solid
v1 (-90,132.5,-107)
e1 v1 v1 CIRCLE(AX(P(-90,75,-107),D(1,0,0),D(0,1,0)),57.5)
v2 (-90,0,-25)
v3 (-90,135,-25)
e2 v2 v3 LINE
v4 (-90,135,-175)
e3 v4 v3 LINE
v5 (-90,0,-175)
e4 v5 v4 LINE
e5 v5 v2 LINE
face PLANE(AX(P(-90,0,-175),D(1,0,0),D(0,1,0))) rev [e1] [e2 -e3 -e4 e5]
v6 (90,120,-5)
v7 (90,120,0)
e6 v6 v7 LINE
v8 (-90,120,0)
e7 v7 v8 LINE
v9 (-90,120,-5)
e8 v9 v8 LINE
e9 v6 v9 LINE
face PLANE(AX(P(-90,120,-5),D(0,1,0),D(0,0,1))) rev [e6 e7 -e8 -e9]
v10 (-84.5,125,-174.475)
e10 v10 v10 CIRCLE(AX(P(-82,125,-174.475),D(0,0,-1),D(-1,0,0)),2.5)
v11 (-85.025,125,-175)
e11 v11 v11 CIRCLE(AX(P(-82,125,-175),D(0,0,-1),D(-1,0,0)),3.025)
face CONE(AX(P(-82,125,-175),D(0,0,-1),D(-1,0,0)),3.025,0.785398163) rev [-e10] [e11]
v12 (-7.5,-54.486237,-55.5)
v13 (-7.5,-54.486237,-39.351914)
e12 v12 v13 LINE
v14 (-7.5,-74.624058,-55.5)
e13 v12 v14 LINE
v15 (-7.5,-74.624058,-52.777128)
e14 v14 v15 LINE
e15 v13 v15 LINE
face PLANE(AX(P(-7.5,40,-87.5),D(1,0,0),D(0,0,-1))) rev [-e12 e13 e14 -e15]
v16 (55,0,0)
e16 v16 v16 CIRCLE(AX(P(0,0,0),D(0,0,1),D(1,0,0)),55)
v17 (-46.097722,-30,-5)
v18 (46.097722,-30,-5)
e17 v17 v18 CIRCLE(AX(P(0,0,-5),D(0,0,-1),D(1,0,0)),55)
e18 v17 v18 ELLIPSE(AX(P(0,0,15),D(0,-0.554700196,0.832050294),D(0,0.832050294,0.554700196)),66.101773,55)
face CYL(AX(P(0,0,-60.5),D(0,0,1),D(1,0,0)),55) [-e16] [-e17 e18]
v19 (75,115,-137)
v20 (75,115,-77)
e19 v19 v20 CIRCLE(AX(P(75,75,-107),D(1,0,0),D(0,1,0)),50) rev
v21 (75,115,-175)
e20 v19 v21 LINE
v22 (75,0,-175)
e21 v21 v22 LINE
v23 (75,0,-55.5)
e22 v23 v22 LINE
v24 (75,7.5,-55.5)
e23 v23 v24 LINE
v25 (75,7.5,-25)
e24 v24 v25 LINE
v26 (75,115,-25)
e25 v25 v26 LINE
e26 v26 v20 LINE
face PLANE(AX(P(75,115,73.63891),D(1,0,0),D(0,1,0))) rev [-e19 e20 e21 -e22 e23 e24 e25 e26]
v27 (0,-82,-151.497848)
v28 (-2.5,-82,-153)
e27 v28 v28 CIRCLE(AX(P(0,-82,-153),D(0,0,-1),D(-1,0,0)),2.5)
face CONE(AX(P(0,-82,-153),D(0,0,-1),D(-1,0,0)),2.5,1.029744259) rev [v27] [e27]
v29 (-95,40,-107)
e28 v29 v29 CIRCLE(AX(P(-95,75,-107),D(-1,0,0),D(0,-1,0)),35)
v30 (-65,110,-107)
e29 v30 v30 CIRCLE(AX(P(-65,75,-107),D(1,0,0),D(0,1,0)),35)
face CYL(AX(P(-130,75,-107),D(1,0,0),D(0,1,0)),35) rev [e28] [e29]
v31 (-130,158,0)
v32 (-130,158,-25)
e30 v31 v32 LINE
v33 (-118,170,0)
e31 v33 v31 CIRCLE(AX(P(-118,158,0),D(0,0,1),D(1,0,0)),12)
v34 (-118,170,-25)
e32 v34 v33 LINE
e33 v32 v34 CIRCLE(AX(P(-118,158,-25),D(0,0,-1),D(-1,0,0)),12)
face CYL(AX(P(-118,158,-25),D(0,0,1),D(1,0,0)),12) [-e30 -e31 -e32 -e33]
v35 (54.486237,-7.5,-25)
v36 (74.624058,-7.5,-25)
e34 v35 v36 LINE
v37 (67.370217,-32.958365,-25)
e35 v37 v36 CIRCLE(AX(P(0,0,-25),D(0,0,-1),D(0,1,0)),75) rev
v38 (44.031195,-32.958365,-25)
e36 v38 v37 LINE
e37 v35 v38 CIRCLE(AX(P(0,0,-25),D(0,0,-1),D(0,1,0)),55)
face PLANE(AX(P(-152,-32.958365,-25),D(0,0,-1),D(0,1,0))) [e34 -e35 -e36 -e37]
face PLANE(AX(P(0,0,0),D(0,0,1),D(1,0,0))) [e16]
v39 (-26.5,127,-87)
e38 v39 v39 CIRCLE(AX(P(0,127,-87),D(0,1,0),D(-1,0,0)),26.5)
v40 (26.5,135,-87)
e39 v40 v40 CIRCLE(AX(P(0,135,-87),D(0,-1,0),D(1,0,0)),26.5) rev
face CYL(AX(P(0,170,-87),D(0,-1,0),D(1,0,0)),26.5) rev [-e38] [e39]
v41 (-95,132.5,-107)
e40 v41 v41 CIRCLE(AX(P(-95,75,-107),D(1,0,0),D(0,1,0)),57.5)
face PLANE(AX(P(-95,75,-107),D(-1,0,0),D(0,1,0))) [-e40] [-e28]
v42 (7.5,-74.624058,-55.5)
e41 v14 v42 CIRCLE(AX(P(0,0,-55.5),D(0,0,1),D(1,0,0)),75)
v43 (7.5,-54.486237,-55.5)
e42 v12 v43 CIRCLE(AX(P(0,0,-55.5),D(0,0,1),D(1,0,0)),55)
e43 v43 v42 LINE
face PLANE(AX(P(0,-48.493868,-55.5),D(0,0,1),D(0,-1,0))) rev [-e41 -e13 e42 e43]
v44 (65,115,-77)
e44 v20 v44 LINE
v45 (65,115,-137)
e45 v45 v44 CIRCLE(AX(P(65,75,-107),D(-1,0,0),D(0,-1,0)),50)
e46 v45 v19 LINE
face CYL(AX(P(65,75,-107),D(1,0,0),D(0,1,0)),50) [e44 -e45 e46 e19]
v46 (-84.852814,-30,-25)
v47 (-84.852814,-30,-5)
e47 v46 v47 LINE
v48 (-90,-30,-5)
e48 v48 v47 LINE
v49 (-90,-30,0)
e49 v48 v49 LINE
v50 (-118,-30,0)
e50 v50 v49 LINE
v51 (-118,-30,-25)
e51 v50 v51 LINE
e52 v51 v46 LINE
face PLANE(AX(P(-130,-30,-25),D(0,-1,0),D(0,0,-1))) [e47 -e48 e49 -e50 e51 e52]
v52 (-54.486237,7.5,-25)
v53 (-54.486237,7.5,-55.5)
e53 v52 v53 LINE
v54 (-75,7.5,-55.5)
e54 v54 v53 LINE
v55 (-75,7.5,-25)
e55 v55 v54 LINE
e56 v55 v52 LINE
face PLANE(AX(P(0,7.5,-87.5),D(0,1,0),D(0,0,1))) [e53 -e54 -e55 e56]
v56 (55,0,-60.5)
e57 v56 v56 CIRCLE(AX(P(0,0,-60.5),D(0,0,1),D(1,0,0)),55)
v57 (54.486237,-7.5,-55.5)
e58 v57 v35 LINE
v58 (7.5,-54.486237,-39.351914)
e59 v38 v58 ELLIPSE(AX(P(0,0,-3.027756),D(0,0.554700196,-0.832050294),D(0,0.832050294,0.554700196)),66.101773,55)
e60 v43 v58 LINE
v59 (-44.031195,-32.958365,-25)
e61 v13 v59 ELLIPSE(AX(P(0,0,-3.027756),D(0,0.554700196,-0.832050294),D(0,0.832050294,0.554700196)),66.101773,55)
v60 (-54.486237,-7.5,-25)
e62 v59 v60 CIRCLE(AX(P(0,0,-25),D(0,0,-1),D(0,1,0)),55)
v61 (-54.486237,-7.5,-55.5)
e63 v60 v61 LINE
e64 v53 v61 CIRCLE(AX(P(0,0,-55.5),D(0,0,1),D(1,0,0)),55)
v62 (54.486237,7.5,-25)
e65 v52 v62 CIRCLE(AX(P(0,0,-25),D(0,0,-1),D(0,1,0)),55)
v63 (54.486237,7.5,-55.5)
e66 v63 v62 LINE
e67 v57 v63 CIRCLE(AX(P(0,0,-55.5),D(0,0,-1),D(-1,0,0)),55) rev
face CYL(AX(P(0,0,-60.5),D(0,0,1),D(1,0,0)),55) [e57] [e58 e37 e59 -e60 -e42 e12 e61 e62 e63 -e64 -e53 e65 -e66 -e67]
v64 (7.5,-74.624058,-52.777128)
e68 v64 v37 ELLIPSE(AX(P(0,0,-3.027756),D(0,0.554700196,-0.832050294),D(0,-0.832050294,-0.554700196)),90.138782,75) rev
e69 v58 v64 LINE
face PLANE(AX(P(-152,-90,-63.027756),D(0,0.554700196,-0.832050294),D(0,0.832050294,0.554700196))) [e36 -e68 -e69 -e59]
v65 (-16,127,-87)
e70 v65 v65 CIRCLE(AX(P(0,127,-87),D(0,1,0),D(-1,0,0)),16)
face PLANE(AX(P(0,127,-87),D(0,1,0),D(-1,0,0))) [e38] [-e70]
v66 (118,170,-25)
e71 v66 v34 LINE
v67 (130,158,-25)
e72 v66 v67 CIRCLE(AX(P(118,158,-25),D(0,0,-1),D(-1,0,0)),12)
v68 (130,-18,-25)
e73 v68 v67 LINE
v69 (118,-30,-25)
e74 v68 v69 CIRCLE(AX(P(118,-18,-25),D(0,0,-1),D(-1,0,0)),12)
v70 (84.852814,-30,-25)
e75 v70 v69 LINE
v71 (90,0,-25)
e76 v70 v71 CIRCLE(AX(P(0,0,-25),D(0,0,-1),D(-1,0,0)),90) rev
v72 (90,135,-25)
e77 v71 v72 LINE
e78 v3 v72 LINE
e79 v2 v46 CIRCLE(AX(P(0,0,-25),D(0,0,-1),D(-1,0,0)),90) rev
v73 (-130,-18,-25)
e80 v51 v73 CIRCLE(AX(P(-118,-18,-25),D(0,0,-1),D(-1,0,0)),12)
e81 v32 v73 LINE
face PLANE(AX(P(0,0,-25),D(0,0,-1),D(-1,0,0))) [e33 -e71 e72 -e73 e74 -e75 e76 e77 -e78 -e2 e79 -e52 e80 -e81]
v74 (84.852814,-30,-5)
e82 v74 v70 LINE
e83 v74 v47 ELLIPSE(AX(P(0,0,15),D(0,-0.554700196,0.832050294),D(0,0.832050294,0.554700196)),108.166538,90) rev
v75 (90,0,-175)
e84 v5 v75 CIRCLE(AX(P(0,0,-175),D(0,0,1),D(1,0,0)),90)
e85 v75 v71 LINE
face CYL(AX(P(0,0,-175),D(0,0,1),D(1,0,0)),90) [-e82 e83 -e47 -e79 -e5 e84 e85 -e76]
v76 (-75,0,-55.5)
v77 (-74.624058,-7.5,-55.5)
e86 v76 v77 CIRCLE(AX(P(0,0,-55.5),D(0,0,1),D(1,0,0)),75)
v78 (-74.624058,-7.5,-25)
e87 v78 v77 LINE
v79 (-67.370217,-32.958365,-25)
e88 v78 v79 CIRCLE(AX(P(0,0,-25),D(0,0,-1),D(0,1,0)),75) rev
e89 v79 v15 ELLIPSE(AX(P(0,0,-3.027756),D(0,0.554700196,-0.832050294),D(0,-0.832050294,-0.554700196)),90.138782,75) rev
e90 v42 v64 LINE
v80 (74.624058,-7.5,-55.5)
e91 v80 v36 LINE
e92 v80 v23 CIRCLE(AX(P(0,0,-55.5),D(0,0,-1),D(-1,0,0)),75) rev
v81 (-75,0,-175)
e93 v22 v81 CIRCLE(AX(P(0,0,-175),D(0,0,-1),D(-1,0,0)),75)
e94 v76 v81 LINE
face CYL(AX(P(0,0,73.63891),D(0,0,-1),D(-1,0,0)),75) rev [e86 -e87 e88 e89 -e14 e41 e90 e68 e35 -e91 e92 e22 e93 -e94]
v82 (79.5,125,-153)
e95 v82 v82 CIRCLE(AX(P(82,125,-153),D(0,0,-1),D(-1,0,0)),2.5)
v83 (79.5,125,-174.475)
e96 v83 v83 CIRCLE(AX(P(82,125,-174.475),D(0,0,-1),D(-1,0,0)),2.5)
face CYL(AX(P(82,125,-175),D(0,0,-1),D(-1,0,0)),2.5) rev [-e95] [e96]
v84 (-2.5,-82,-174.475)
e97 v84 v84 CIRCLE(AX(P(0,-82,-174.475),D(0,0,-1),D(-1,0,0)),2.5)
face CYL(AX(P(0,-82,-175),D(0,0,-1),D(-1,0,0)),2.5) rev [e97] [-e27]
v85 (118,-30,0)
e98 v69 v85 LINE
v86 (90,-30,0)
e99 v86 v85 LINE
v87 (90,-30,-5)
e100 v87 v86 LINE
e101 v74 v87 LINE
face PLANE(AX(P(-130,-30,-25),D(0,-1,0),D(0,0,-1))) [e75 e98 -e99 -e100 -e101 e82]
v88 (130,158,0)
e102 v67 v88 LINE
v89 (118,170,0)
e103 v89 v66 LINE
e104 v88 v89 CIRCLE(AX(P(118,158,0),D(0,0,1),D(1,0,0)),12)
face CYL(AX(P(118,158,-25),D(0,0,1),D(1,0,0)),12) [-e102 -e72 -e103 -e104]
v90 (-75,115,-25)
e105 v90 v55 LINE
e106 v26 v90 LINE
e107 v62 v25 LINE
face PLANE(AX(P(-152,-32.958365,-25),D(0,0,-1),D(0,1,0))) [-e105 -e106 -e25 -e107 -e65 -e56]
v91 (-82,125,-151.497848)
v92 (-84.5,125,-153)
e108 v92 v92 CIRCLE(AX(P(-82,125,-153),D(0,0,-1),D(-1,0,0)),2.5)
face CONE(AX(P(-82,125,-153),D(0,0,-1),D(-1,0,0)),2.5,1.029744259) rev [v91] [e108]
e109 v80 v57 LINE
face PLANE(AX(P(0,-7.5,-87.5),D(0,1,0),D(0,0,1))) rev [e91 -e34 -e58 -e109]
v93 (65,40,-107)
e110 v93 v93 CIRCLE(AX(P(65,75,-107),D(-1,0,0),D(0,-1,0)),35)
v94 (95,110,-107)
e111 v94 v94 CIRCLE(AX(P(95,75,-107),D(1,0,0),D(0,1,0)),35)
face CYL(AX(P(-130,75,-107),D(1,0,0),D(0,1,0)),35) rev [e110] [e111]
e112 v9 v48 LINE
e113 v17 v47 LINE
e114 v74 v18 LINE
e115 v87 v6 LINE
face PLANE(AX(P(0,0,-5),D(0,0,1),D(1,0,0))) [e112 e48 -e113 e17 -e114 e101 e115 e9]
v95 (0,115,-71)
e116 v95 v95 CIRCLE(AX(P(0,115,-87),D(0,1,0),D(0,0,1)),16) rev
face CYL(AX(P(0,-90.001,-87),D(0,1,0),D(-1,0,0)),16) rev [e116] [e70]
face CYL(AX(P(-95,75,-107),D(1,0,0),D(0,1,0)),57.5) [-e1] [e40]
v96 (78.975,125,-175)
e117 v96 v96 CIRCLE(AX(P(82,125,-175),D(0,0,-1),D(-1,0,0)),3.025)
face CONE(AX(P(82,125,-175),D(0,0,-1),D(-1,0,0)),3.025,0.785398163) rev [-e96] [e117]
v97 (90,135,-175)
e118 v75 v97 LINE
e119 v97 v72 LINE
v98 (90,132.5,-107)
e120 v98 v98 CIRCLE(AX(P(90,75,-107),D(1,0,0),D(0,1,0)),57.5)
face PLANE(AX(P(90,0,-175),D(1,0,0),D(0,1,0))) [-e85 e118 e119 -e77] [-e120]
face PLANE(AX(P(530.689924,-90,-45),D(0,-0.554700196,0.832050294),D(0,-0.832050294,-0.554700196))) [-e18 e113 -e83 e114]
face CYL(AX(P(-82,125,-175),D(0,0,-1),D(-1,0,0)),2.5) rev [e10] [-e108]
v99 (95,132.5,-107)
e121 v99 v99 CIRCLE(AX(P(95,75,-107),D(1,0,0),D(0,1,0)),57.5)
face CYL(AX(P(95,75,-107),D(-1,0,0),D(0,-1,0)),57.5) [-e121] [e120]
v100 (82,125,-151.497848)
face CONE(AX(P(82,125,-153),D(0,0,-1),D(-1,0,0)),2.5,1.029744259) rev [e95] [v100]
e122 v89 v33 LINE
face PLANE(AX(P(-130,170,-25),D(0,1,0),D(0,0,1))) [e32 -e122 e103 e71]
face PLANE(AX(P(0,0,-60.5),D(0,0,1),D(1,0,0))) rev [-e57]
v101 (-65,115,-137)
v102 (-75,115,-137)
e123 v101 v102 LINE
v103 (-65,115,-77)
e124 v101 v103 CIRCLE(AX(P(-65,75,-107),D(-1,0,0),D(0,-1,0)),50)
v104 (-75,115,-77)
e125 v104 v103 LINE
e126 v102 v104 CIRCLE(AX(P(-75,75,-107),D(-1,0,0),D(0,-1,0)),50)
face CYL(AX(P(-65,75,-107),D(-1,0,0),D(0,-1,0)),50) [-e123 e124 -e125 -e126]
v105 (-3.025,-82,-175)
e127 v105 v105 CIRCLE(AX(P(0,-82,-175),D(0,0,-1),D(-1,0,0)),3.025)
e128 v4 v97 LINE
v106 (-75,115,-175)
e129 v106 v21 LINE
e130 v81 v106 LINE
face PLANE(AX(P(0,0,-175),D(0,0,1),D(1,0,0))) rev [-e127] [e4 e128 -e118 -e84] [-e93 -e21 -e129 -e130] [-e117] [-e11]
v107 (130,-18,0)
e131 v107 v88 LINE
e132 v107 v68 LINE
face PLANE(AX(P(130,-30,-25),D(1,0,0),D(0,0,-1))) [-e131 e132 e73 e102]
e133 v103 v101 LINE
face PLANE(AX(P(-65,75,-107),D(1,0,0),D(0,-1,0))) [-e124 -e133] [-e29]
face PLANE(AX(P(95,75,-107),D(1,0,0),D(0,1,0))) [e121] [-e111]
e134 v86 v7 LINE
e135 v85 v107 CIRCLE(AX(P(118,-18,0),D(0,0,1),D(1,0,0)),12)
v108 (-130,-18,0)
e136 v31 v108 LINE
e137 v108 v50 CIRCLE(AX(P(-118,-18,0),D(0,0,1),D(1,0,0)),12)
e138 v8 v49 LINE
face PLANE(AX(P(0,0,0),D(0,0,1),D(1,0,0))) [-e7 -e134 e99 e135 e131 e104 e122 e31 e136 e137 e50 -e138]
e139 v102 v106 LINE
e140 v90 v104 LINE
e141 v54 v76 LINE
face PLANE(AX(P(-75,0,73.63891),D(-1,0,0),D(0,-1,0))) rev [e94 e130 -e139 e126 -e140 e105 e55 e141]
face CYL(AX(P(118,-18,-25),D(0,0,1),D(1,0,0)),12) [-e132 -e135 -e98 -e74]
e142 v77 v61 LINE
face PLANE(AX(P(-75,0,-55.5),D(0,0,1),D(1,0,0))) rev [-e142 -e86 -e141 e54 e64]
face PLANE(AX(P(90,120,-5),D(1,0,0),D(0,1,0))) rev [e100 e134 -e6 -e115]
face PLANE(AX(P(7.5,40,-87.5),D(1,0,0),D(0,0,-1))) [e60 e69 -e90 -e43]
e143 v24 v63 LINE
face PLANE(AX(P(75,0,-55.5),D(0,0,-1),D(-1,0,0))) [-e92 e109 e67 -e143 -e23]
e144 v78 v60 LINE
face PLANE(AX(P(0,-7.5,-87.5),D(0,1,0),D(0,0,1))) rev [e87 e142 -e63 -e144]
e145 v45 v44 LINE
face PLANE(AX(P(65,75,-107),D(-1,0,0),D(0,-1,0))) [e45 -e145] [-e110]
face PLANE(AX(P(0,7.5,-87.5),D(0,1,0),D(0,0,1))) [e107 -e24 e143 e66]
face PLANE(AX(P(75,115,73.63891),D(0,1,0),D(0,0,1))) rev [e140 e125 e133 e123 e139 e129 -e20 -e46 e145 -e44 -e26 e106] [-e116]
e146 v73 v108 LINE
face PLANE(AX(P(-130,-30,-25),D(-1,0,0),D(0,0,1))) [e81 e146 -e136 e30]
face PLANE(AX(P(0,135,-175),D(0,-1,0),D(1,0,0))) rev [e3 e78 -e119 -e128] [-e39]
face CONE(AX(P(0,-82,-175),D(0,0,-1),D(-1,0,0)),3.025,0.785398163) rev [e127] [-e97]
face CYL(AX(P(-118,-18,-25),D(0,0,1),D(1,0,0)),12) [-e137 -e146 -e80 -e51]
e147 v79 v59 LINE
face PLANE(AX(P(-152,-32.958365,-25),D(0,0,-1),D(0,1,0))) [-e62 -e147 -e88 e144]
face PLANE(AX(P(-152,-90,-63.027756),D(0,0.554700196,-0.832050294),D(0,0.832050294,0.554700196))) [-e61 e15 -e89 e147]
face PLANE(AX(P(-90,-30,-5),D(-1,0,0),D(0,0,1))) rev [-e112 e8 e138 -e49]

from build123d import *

# Parameters (mm, degrees)
EXTRUDE_START                = -5
EXTRUDE_1_DEPTH              = 170
CUT_EXTRUDE_1_DEPTH          = 239.641991276
CUT_EXTRUDE_1_DEPTH_BACK     = 239.641991276
CUT_EXTRUDE_START            = -121.972243623
CUT_EXTRUDE_2_DEPTH          = 121.972243623
CUT_EXTRUDE_START_2          = -53.027756377
CUT_EXTRUDE_2_2_DEPTH        = 28.027756377
CUT_EXTRUDE_START_3          = -12.480754415
CUT_EXTRUDE_2_3_DEPTH        = 15
SKETCH_5_R                   = 55
EXTRUDE_2_DEPTH              = 60.5
SKETCH_6_W                   = 260
SKETCH_6_H                   = 200
EXTRUDE_3_DEPTH              = 25
CUT_EXTRUDE_3_DEPTH          = 5
FILLET_1_R                   = 12
SKETCH_9_R                   = 57.5
EXTRUDE_4_DEPTH              = 5
SKETCH_10_R                  = 50
EXTRUDE_5_DEPTH              = 30
CUT_EXTRUDE_4_DEPTH          = 332.888535558
CUT_EXTRUDE_4_DEPTH_BACK     = 332.888535558
SKETCH_11_R                  = 35
CUT_EXTRUDE_5_DEPTH          = 314.289004012
CUT_EXTRUDE_5_DEPTH_BACK     = 8
SKETCH_12_R                  = 26.5
CUT_EXTRUDE_6_REACH          = 309.594
SKETCH_13_R                  = 16
RIB_START                    = -7.5
RIB_1_DEPTH                  = 15
RIB_2_REACH                  = 278.451
SKETCH_15_WALL_W             = 586.29307431
SKETCH_15_WALL_H             = 15
HOLE_WIZARD_M6_1_D           = 5
HOLE_WIZARD_M6_1_DEPTH       = 22
HOLE_WIZARD_M6_1_CSINK_D     = 6.05
HOLE_WIZARD_M6_1_CSINK_ANGLE = 90
HOLE_WIZARD_M6_1_TIP         = 1.502151548
HOLE_WIZARD_M6_2_D           = 5
HOLE_WIZARD_M6_2_DEPTH       = 22
HOLE_WIZARD_M6_2_CSINK_D     = 6.05
HOLE_WIZARD_M6_2_CSINK_ANGLE = 90
HOLE_WIZARD_M6_2_TIP         = 1.502151548


with BuildPart() as part:
    # 草图1 → 凸台-拉伸1 (new body)
    with BuildSketch(Plane.XY.offset(EXTRUDE_START)):
        with BuildLine():
            Line((-90, 0), (-90, 135))
            Line((-90, 135), (90, 135))
            Line((90, 135), (90, 0))
            ThreePointArc((90, 0), (0, -90), (-90, 0))
        make_face()
    extrude(amount=-EXTRUDE_1_DEPTH)

    # 草图2 → 切除-拉伸1 (cut, two sides: drawn at the far end of the back side and taken through both)
    with BuildSketch(Plane(origin=(0, 0, 0), x_dir=(0, 0, -1), z_dir=(1, 0, 0)).offset(-CUT_EXTRUDE_1_DEPTH_BACK)):
        Polygon((338.831049921, -530.746574882), (45, -90), (5, -30), (-288.831049921, 410.746574882), (-1170.324199685, -176.915524961), (-542.662099843, -1118.408674725), align=None)
    extrude(amount=CUT_EXTRUDE_1_DEPTH + CUT_EXTRUDE_1_DEPTH_BACK, mode=Mode.SUBTRACT)

    # 切除-拉伸2: read off the stored shape, not the designer's step
    # 切除-拉伸2 outline → 切除-拉伸2 (cut)
    with BuildSketch(Plane(origin=(0, 0, -175), x_dir=(-1, 0, 0), z_dir=(0, 0, -1)).offset(CUT_EXTRUDE_START)):
        with BuildLine():
            Line((75, 115), (-75, 115))
            Line((-75, 115), (-75, 0))
            ThreePointArc((-75, 0), (0, -75), (75, 0))
            Line((75, 0), (75, 115))
        make_face()
    extrude(amount=CUT_EXTRUDE_2_DEPTH, mode=Mode.SUBTRACT)

    # Cut-Extrude 2 2 outline → Cut-Extrude 2 2 (cut)
    with BuildSketch(Plane.XY.offset(CUT_EXTRUDE_START_2)):
        with BuildLine():
            ThreePointArc((-75, 0), (0, -75), (75, 0))
            Line((75, 0), (75, 115))
            Line((75, 115), (-75, 115))
            Line((-75, 115), (-75, 0))
        make_face()
    extrude(amount=CUT_EXTRUDE_2_2_DEPTH, mode=Mode.SUBTRACT)

    # Cut-Extrude 2 3 outline → Cut-Extrude 2 3 (add)
    with BuildSketch(Plane(origin=(0, 0, 0), x_dir=(1, 0, 0), z_dir=(0, 0.5547001962252289, -0.8320502943378438)).offset(CUT_EXTRUDE_START_3)):
        with BuildLine():
            Line((-67.370217069, 41.290522566), (67.370217069, 41.290522566))
            add(Edge.make_bspline(
                [(67.370217069, 41.290522566), (0, 206.799154918), (-67.370217069, 41.290522566)],
                knots=[5.167369564, 5.167369564, 5.167369564, 7.399001051, 7.399001051, 7.399001051], degree=2, weights=[1, 0.439444872, 1]))
        make_face()
    extrude(amount=CUT_EXTRUDE_2_3_DEPTH)

    # 草图5 → 凸台-拉伸2 (add)
    with BuildSketch(Plane.XY):
        Circle(SKETCH_5_R)
    extrude(amount=-EXTRUDE_2_DEPTH)

    # 草图6 → 凸台-拉伸3 (add)
    with BuildSketch(Plane.XY):
        with Locations((0, 70)):
            Rectangle(SKETCH_6_W, SKETCH_6_H)
    extrude(amount=-EXTRUDE_3_DEPTH)

    # 草图8 → 切除-拉伸3 (cut)
    with BuildSketch(Plane.XY):
        with BuildLine():
            Line((-90, -30), (-90, 120))
            Line((-90, 120), (90, 120))
            Line((90, 120), (90, -30))
            Line((90, -30), (46.097722286, -30))
            ThreePointArc((46.097722286, -30), (0, 55), (-46.097722286, -30))
            Line((-46.097722286, -30), (-90, -30))
        make_face()
    extrude(amount=-CUT_EXTRUDE_3_DEPTH, mode=Mode.SUBTRACT)

    # 圆角1
    fillet_1_edges = [part.edges().sort_by_distance(p)[0] for p in [
        (130, -30, -12.5),
        (130, 170, -12.5),
        (-130, -30, -12.5),
        (-130, 170, -12.5),
    ]]
    fillet(fillet_1_edges, radius=FILLET_1_R)

    # 草图9 → 凸台-拉伸4 (add)
    with BuildSketch(Plane(origin=(90, 0, 0), x_dir=(0, 0, -1), z_dir=(1, 0, 0))):
        with Locations(Location((107, 75, 0), (0, 0, 90))):
            Circle(SKETCH_9_R)
    extrude_4 = extrude(amount=EXTRUDE_4_DEPTH)

    # 草图10 → 凸台-拉伸5 (add)
    with BuildSketch(Plane.ZY.offset(-95)):
        with Locations((-107, 75)):
            Circle(SKETCH_10_R)
    extrude_5 = extrude(amount=EXTRUDE_5_DEPTH)

    # 镜向1: 凸台-拉伸4, 凸台-拉伸5 across plane
    add(extrude_4.mirror(Plane(origin=(0, 0, 0), x_dir=(0, 0, 1), z_dir=(1, 0, 0))))
    add(extrude_5.mirror(Plane(origin=(0, 0, 0), x_dir=(0, 0, 1), z_dir=(1, 0, 0))))

    # 草图11 → 切除-拉伸4 (cut, two sides: drawn at the far end of the back side and taken through both)
    with BuildSketch(Plane(origin=(95, 0, 0), x_dir=(0, 0, -1), z_dir=(1, 0, 0)).offset(-CUT_EXTRUDE_4_DEPTH_BACK)):
        with Locations(Location((107, 75, 0), (0, 0, 90))):
            Circle(SKETCH_11_R)
    extrude(amount=CUT_EXTRUDE_4_DEPTH + CUT_EXTRUDE_4_DEPTH_BACK, mode=Mode.SUBTRACT)

    # 草图12 → 切除-拉伸5 (cut, two sides: drawn at the far end of the back side and taken through both)
    with BuildSketch(Plane(origin=(0, 135, 0), x_dir=(1, 0, 0), z_dir=(0, 1, 0)).offset(-CUT_EXTRUDE_5_DEPTH_BACK)):
        with Locations((0, 87)):
            Circle(SKETCH_12_R)
    extrude(amount=CUT_EXTRUDE_5_DEPTH + CUT_EXTRUDE_5_DEPTH_BACK, mode=Mode.SUBTRACT)

    # 草图13 → 切除-拉伸6 (cut, up to next)
    with BuildSketch(Plane(origin=(0, 127, 0), x_dir=(1, 0, 0), z_dir=(0, 1, 0)), mode=Mode.PRIVATE) as cut_extrude_6_sk1:
        with Locations(Location((0, 87, 0), (0, 0, 180))):
            Circle(SKETCH_13_R)
    cut_extrude_6_tool1 = extrude(cut_extrude_6_sk1.sketch, amount=-CUT_EXTRUDE_6_REACH, mode=Mode.PRIVATE) & part.part
    add(cut_extrude_6_tool1.solids().sort_by_distance((0, 127, -87))[0], mode=Mode.SUBTRACT)

    # 筋1: read off the stored shape, not the designer's step
    # 筋1 outline → 筋1 (add)
    with BuildSketch(Plane(origin=(0, 0, 0), x_dir=(0, 0, -1), z_dir=(1, 0, 0)).offset(RIB_START)):
        Polygon((55.5, -76), (55.5, -53), (38.361089711, -53), (53.027756377, -75), (53.694423044, -76), align=None)
    extrude(amount=RIB_1_DEPTH)

    # 草图15 wall → 筋2 (add, up to next)
    with BuildSketch(Plane(origin=(59.304181844, 0, -55.5), x_dir=(-1, 0, 0), z_dir=(0, 0, 1)), mode=Mode.PRIVATE) as rib_2_sk1:
        Rectangle(SKETCH_15_WALL_W, SKETCH_15_WALL_H)
    rib_2_tool1 = extrude(rib_2_sk1.sketch, amount=RIB_2_REACH, mode=Mode.PRIVATE) - part.part
    rib_2 = rib_2_tool1.solids().sort_by_distance((59.304181844, 0, -55.5))[0]
    add(rib_2)

    # 镜向4: 筋2 across plane
    add(rib_2.mirror(Plane(origin=(0, 0, 0), x_dir=(0, 0, 1), z_dir=(1, 0, 0))))

    # M6 螺纹孔1
    with Locations(Plane(origin=(0, 0, -175), x_dir=(-1, 0, 0), z_dir=(0, 0, -1))):
        with Locations((82, 125), (-82, 125)):
            CounterSinkHole(HOLE_WIZARD_M6_1_D / 2, HOLE_WIZARD_M6_1_CSINK_D / 2, depth=HOLE_WIZARD_M6_1_DEPTH, counter_sink_angle=HOLE_WIZARD_M6_1_CSINK_ANGLE)
            with Locations((0, 0, -(HOLE_WIZARD_M6_1_DEPTH + HOLE_WIZARD_M6_1_TIP / 2))):  # 118° drill point
                Cone(0, HOLE_WIZARD_M6_1_D / 2, HOLE_WIZARD_M6_1_TIP, mode=Mode.SUBTRACT)

    # M6 螺纹孔2
    with Locations(Plane(origin=(0, 0, -175), x_dir=(-1, 0, 0), z_dir=(0, 0, -1))):
        with Locations((0, -82)):
            CounterSinkHole(HOLE_WIZARD_M6_2_D / 2, HOLE_WIZARD_M6_2_CSINK_D / 2, depth=HOLE_WIZARD_M6_2_DEPTH, counter_sink_angle=HOLE_WIZARD_M6_2_CSINK_ANGLE)
            with Locations((0, 0, -(HOLE_WIZARD_M6_2_DEPTH + HOLE_WIZARD_M6_2_TIP / 2))):  # 118° drill point
                Cone(0, HOLE_WIZARD_M6_2_D / 2, HOLE_WIZARD_M6_2_TIP, mode=Mode.SUBTRACT)


solid = part.part
